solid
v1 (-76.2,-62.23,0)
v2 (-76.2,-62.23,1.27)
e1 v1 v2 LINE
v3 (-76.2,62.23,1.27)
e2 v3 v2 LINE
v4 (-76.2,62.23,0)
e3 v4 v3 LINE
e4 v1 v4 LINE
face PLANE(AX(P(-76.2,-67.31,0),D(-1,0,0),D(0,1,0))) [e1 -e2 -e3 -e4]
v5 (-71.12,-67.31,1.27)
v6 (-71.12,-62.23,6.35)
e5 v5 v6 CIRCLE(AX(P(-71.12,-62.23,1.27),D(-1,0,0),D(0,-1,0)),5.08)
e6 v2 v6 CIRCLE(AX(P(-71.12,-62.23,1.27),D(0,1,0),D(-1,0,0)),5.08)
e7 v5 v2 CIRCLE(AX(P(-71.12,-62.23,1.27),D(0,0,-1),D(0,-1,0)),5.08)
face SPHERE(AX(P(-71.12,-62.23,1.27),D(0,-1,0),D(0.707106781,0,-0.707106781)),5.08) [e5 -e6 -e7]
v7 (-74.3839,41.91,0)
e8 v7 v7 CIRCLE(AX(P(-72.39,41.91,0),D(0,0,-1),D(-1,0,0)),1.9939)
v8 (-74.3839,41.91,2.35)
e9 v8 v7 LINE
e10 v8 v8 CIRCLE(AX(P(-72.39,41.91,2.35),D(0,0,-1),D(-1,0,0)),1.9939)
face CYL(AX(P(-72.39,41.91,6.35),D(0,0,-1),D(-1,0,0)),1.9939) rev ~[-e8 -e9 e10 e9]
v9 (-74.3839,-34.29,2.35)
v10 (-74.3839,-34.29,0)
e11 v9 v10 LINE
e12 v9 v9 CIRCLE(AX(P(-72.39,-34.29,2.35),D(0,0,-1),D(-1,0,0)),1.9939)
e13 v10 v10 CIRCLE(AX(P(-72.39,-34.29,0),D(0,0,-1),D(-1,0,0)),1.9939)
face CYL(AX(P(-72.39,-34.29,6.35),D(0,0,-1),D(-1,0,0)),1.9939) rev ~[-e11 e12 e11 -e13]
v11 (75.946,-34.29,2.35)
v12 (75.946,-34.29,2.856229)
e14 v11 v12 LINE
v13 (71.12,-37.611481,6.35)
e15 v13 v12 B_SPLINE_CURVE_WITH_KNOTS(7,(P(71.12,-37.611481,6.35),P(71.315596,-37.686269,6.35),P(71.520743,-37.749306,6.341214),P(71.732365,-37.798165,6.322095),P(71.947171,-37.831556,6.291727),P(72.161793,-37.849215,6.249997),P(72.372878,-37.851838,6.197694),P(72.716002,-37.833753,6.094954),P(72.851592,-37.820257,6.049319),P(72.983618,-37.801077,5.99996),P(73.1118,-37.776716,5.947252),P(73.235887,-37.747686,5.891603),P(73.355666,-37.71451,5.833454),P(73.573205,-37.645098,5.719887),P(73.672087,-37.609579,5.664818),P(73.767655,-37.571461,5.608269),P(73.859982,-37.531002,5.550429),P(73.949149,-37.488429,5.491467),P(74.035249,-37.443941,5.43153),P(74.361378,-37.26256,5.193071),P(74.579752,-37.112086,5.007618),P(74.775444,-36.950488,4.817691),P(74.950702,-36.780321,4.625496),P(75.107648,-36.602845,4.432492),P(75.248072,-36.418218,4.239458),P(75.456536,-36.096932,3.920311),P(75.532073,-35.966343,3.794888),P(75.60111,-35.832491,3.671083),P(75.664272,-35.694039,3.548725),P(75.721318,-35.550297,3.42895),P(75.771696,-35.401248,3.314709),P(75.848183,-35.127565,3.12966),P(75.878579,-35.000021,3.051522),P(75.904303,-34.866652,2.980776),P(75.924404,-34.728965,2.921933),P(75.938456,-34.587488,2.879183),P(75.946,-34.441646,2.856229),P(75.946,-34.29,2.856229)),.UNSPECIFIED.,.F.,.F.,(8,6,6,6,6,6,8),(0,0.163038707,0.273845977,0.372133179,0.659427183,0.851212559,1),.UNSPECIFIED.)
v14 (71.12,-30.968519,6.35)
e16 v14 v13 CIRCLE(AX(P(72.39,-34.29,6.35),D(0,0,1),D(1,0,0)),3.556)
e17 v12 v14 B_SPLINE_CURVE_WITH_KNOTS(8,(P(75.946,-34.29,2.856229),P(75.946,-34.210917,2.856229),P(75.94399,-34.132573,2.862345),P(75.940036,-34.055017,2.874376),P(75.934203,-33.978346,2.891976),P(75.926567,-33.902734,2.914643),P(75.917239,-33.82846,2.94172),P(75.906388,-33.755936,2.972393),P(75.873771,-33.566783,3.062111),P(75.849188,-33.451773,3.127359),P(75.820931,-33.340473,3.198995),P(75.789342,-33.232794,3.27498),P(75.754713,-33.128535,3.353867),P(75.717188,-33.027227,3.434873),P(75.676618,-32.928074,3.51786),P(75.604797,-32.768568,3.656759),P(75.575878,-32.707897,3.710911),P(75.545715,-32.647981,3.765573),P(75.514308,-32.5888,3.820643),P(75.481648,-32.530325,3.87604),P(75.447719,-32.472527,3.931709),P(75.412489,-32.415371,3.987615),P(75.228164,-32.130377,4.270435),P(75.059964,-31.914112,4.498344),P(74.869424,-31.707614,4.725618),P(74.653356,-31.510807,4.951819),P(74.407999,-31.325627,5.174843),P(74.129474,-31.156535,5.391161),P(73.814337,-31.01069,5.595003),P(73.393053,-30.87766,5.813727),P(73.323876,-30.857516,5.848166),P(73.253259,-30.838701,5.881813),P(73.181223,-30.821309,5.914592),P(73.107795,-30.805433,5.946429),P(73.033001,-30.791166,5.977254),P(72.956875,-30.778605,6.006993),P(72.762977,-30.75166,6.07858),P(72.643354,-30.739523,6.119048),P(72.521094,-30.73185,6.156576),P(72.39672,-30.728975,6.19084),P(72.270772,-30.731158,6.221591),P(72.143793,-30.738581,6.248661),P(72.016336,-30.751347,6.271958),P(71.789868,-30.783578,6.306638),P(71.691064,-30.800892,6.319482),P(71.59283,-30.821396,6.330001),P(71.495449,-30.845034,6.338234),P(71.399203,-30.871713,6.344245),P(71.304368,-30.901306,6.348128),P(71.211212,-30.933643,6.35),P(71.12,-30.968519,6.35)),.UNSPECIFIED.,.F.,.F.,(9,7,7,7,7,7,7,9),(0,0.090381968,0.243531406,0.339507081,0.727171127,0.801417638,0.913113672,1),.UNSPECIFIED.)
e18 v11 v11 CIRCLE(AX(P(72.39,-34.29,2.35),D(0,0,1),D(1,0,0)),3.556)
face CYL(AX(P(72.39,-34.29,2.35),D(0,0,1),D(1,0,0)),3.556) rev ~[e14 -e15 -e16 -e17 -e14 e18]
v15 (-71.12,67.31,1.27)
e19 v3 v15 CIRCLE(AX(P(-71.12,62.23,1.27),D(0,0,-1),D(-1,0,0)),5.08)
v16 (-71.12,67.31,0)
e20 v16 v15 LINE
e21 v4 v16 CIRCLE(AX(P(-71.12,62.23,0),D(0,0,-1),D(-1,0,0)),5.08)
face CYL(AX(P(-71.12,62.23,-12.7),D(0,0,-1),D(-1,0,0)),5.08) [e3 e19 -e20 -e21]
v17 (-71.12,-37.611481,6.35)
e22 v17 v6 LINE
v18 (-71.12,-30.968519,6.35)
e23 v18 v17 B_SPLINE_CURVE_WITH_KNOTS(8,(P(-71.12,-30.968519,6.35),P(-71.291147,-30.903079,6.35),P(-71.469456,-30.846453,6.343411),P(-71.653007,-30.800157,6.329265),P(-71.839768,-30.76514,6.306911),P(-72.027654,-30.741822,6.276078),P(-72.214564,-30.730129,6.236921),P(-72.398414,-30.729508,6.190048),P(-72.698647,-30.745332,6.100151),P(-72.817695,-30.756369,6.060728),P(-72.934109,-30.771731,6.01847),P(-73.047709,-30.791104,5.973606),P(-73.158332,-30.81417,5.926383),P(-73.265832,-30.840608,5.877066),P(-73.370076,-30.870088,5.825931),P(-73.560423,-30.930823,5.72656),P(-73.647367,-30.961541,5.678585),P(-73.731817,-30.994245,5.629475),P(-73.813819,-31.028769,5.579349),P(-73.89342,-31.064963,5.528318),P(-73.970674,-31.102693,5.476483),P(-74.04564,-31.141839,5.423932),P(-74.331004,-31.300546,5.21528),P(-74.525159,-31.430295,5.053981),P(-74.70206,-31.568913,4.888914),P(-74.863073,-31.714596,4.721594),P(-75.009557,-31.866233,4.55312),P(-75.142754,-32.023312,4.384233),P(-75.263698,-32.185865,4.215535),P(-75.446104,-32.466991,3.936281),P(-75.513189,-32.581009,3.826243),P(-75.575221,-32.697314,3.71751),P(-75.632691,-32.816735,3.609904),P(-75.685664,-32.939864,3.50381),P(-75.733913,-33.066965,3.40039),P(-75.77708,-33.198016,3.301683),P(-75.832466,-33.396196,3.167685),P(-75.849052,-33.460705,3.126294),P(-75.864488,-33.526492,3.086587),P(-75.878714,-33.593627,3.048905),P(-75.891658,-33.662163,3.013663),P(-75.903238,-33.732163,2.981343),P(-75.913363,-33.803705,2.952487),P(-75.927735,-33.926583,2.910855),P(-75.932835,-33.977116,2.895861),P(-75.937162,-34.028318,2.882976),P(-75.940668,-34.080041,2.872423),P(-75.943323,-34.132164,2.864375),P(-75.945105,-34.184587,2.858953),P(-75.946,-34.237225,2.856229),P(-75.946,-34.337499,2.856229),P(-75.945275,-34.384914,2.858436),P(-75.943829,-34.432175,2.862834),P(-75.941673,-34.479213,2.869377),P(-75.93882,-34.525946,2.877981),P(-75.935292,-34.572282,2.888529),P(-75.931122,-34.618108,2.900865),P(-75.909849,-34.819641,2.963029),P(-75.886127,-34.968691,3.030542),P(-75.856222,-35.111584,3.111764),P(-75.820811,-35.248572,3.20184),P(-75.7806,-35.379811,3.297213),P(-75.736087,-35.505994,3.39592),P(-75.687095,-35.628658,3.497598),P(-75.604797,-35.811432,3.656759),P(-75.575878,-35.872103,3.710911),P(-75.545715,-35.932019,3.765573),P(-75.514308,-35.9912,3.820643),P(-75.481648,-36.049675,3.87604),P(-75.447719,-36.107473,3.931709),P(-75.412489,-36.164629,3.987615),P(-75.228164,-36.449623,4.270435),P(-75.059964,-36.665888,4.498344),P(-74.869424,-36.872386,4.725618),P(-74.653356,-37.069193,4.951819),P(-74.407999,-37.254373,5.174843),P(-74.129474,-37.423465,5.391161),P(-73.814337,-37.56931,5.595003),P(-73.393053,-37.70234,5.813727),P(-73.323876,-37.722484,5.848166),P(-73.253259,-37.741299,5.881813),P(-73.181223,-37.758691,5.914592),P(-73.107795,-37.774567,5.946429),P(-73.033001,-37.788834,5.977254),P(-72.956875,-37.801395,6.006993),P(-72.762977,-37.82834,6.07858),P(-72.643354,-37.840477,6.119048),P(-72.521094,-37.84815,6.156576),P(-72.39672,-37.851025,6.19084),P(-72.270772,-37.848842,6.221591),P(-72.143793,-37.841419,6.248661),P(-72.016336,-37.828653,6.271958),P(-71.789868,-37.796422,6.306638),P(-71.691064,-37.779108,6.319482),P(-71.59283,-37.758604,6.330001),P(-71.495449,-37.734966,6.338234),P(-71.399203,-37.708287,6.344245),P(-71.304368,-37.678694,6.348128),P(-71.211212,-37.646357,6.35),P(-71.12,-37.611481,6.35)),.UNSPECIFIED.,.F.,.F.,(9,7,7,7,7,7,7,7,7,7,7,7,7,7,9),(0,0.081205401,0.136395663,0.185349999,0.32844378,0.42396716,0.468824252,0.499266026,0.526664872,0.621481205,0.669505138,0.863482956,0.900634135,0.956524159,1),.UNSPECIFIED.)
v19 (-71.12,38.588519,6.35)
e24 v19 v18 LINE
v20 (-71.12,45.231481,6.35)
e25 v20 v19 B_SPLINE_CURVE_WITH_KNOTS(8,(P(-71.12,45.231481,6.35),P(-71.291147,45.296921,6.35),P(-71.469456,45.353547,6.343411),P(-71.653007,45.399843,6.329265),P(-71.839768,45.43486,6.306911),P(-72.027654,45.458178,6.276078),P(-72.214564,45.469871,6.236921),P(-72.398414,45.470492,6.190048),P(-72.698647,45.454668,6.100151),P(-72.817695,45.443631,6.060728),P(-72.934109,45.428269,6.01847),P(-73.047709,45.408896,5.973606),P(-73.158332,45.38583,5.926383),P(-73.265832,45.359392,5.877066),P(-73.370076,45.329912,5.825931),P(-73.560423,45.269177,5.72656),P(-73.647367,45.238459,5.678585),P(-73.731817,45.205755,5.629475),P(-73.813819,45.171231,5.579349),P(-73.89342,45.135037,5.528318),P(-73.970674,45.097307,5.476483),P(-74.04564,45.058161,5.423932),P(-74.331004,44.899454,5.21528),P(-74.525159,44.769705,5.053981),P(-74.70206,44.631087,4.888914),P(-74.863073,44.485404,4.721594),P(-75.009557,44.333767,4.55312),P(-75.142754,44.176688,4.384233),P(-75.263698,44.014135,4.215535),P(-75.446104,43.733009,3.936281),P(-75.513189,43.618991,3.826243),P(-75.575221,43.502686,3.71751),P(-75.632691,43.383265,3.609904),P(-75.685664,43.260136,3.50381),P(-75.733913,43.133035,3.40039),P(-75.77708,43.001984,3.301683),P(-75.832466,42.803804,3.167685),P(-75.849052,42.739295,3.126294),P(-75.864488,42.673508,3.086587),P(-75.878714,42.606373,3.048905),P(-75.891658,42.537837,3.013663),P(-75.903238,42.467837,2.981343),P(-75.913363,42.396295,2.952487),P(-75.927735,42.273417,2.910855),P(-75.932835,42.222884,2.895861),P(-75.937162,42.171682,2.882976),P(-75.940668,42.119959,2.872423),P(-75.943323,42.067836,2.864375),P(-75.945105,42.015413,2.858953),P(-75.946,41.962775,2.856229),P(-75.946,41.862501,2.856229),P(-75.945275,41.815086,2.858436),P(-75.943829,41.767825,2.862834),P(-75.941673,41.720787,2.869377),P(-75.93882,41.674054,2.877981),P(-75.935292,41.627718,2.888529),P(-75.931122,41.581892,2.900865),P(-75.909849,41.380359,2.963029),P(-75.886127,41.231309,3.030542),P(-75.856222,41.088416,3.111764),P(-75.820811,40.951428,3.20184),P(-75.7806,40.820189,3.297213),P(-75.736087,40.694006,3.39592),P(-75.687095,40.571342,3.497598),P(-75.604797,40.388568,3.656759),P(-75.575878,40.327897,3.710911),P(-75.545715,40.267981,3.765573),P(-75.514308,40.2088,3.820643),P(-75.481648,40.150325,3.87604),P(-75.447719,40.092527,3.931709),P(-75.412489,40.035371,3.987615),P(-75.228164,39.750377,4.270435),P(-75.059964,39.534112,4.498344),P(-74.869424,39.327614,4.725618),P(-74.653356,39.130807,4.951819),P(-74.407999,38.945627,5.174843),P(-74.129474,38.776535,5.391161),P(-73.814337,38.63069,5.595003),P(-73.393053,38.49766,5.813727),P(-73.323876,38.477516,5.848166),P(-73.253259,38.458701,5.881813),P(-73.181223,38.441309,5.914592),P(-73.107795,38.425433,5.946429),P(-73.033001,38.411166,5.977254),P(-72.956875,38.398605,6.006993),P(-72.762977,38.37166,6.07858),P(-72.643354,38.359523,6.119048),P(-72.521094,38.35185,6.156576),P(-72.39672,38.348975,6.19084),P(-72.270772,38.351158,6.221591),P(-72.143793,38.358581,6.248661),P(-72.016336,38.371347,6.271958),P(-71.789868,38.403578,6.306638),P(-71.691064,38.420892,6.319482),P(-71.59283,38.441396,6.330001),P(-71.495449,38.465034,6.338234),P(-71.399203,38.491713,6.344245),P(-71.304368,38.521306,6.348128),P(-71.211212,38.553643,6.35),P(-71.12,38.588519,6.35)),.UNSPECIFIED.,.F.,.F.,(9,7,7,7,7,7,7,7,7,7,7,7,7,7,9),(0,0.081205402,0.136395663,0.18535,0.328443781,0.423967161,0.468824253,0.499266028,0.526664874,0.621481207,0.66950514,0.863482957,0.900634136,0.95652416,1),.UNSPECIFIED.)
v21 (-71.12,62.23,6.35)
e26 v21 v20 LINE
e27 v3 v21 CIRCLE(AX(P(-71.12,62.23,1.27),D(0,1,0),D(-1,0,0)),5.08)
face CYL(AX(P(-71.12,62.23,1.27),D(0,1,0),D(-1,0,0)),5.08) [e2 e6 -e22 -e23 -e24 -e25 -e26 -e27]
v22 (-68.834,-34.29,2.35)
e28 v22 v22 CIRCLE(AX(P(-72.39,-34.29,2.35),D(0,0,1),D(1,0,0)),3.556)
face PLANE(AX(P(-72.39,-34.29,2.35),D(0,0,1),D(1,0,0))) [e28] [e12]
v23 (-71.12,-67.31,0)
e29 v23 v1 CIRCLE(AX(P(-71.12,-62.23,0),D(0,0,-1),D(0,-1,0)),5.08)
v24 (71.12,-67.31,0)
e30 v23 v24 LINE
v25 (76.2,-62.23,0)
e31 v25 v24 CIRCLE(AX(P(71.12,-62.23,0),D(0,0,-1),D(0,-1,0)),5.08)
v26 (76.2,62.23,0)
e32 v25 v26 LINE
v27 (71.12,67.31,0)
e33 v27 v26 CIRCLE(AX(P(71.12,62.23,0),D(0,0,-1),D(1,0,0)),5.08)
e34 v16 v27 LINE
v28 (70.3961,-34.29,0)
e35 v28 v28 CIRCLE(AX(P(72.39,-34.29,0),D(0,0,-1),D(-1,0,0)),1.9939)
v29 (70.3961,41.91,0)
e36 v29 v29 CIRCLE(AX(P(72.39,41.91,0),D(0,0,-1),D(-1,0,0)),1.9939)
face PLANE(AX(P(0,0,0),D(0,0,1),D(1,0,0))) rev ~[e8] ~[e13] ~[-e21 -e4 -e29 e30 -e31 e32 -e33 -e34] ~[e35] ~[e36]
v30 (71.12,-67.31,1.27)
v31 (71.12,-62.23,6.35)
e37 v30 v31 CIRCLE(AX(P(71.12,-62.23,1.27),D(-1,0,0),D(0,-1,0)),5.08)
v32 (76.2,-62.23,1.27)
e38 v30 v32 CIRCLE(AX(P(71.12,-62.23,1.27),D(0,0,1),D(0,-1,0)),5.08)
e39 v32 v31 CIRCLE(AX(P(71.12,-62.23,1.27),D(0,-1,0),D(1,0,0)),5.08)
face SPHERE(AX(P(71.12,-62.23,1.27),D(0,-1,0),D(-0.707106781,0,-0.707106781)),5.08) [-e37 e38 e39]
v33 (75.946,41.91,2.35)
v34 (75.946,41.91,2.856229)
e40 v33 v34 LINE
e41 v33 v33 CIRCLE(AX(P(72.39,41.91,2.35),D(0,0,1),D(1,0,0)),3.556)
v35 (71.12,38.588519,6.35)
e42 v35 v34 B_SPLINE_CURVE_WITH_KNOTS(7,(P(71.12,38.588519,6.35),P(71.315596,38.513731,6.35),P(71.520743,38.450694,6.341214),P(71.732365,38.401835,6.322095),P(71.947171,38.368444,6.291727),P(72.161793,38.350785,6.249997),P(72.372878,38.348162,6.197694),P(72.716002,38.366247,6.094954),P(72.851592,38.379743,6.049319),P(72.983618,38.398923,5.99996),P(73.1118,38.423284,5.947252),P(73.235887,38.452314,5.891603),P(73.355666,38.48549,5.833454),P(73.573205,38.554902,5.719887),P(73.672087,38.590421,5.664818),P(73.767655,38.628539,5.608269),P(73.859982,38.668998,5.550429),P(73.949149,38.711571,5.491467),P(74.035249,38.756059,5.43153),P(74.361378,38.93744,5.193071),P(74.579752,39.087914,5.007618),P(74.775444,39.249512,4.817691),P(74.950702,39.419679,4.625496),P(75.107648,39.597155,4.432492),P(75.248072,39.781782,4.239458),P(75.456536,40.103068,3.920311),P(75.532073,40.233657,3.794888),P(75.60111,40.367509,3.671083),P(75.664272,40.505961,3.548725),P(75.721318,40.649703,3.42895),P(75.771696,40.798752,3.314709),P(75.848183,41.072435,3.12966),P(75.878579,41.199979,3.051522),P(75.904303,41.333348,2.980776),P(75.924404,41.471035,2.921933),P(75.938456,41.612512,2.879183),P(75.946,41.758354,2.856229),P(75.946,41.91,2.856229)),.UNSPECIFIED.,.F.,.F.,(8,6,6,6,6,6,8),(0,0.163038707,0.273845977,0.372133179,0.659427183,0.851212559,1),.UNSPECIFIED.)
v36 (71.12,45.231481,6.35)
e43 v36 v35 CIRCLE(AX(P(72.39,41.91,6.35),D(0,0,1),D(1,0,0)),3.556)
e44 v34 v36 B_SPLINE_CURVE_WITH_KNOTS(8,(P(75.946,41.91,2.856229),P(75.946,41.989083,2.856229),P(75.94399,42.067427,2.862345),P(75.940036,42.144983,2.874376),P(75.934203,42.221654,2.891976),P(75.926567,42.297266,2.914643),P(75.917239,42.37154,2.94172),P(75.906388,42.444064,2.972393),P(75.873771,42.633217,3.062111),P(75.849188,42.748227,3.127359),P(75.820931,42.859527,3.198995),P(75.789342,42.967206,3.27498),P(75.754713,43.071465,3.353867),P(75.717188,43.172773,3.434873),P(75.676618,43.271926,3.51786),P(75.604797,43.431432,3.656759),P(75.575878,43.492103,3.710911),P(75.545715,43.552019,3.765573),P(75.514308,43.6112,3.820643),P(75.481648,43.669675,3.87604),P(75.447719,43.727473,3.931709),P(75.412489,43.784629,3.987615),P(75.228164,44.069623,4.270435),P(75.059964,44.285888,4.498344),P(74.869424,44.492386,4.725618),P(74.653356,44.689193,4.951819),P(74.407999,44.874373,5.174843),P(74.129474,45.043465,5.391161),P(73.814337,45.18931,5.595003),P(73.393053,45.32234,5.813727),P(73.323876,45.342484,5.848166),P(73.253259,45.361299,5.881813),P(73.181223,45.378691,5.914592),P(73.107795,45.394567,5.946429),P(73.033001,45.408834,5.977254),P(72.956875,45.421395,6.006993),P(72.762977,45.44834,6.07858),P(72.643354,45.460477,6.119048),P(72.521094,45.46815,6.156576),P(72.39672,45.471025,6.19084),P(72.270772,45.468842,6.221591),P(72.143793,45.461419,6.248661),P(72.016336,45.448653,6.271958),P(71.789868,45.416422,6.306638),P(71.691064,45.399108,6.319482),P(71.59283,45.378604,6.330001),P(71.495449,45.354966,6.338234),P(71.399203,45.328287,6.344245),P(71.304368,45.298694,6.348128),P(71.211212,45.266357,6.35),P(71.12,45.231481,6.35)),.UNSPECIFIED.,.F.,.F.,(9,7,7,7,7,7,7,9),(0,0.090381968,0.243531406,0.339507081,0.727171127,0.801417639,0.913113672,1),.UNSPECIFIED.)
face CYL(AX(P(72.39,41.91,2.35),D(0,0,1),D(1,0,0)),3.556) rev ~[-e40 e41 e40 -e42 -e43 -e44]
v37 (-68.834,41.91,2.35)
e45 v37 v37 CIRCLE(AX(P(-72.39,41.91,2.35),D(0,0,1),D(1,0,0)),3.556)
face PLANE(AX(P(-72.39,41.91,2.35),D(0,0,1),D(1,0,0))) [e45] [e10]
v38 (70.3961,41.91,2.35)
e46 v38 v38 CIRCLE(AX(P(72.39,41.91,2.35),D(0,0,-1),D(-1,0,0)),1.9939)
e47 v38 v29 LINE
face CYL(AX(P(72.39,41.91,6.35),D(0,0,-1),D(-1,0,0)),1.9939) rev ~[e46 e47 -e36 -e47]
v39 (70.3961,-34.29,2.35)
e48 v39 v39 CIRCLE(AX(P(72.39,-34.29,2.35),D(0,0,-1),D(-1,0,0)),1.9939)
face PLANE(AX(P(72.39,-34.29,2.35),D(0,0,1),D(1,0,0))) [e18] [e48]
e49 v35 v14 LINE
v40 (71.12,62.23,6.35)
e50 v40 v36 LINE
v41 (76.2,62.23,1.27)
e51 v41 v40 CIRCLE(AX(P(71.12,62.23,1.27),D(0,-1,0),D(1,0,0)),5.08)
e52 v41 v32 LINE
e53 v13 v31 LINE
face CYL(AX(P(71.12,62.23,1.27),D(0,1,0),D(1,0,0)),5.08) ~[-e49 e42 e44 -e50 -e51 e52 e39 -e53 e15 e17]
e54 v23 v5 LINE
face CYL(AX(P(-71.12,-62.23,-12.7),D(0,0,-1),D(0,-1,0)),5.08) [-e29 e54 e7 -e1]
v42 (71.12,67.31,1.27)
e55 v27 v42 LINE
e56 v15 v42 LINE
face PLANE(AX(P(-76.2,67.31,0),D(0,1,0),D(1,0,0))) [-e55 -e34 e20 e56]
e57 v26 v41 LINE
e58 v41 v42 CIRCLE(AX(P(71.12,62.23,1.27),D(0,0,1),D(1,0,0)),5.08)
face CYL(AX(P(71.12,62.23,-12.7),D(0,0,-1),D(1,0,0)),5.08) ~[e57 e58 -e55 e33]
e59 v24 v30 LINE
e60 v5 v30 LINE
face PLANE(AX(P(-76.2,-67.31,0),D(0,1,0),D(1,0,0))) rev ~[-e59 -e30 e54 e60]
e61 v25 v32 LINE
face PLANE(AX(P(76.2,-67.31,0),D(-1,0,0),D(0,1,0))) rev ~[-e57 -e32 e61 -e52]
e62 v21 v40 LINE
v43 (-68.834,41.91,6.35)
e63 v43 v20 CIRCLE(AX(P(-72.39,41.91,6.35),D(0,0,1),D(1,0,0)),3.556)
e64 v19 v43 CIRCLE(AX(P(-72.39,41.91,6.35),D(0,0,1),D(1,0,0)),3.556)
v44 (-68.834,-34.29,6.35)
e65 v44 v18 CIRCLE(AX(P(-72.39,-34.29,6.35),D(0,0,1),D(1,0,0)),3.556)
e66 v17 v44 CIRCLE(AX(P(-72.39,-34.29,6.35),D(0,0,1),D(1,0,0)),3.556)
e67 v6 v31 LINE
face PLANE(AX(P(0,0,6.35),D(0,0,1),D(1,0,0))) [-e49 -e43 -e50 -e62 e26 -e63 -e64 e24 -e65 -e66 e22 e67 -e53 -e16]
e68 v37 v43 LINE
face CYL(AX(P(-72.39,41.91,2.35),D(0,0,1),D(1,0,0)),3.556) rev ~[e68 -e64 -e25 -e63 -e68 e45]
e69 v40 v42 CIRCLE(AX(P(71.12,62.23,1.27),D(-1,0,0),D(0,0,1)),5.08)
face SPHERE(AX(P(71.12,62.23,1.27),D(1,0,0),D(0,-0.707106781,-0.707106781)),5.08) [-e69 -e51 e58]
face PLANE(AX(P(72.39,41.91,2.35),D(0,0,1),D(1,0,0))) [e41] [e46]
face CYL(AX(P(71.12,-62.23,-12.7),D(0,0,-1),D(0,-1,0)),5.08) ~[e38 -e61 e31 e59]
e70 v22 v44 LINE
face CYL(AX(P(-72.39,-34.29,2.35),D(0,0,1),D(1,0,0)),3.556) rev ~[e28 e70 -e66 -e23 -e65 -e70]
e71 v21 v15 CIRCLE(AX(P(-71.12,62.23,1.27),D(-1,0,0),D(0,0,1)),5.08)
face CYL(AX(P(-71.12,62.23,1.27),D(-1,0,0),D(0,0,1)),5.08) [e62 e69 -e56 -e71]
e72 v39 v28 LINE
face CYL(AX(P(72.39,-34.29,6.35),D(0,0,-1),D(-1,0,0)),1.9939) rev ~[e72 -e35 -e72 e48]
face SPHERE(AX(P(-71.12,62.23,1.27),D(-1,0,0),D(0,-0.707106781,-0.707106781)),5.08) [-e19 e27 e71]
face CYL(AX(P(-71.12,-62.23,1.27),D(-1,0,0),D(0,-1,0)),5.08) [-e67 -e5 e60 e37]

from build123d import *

# Parameters (mm, degrees)
F0_W           = 152.4
F0_H           = 134.62
F1_DEPTH       = 6.35
F3_D           = 3.9878
F3_CBORE_D     = 7.112
F3_CBORE_DEPTH = 4.000000001
F4_T1_DEPTH    = 124.46
F4_T3_DEPTH    = 142.24
F4_T5_DEPTH    = 13.97
F4_S9_W        = 5.08
F4_S9_H        = 5.08
F4_T10_DEPTH   = 5.08
F4_S15_W       = 5.08
F4_S15_H       = 5.08
F4_T16_DEPTH   = 5.08
F4_S21_W       = 5.08
F4_S21_H       = 5.08
F4_T22_DEPTH   = 5.08
F4_S27_W       = 5.08
F4_S27_H       = 5.08
F4_T28_DEPTH   = 5.08


# Not quite as in the source:
# - a fillet or chamfer that OpenCascade refuses, or shapes differently, is made with other operations: its cross-section is extruded or revolved along the edge and cut away or added
# - a feature names something its author has since deleted; it is built from what else it names


with BuildPart() as f1:
    # F0 (on Top) → F1 (new body)
    with BuildSketch(Plane.XY):
        Rectangle(F0_W, F0_H)
    extrude(amount=F1_DEPTH)

    # F3 (through all)
    with Locations(Plane.XY.offset(6.35)):
        with Locations((-72.39, 41.91), (-72.39, -34.29), (72.39, -34.29), (72.39, 41.91)):
            CounterBoreHole(F3_D / 2, F3_CBORE_D / 2, F3_CBORE_DEPTH)

    # F4: fillet of radius 5.08 on 8 edges, made by hand

    # F4_s2 → F4_t1 (cut)
    with BuildSketch(Plane.XZ.offset(-62.23)):
        with BuildLine():
            ThreePointArc((-76.2, 1.27), (-74.7121024484, 4.8621024484), (-71.12, 6.35))
            Line((-71.12, 6.35), (-76.2, 6.35))
            Line((-76.2, 6.35), (-76.2, 1.27))
        make_face()
        with BuildLine():
            ThreePointArc((76.2, 1.27), (74.7121024484, 4.8621024484), (71.12, 6.35))
            Line((71.12, 6.35), (76.2, 6.35))
            Line((76.2, 6.35), (76.2, 1.27))
        make_face()
    extrude(amount=F4_T1_DEPTH, mode=Mode.SUBTRACT)

    # F4_s4 → F4_t3 (cut)
    with BuildSketch(Plane.YZ.offset(-71.12)):
        with BuildLine():
            ThreePointArc((62.23, 6.35), (65.8221024484, 4.8621024484), (67.31, 1.27))
            Line((67.31, 1.27), (67.31, 6.35))
            Line((67.31, 6.35), (62.23, 6.35))
        make_face()
        with BuildLine():
            ThreePointArc((-67.31, 1.27), (-65.8221024484, 4.8621024484), (-62.23, 6.35))
            Line((-62.23, 6.35), (-67.31, 6.35))
            Line((-67.31, 6.35), (-67.31, 1.27))
        make_face()
    extrude(amount=F4_T3_DEPTH, mode=Mode.SUBTRACT)

    # F4_s6 → F4_t5 (cut)
    with BuildSketch(Plane.XY.offset(-12.7)):
        with BuildLine():
            ThreePointArc((-71.12, -67.31), (-74.7121024484, -65.8221024484), (-76.2, -62.23))
            Line((-76.2, -62.23), (-76.2, -67.31))
            Line((-76.2, -67.31), (-71.12, -67.31))
        make_face()
        with BuildLine():
            ThreePointArc((71.12, -67.31), (74.7121024484, -65.8221024484), (76.2, -62.23))
            Line((76.2, -62.23), (76.2, -67.31))
            Line((76.2, -67.31), (71.12, -67.31))
        make_face()
        with BuildLine():
            ThreePointArc((76.2, 62.23), (74.7121024484, 65.8221024484), (71.12, 67.31))
            Line((71.12, 67.31), (76.2, 67.31))
            Line((76.2, 67.31), (76.2, 62.23))
        make_face()
        with BuildLine():
            ThreePointArc((-76.2, 62.23), (-74.7121024484, 65.8221024484), (-71.12, 67.31))
            Line((-71.12, 67.31), (-76.2, 67.31))
            Line((-76.2, 67.31), (-76.2, 62.23))
        make_face()
    extrude(amount=F4_T5_DEPTH, mode=Mode.SUBTRACT)


with BuildPart() as f4_tool8:
    # F4_s9 → F4_t10 (new body)
    with BuildSketch(Plane.YZ.offset(-71.12)):
        with Locations((64.77, 3.81)):
            Rectangle(F4_S9_W, F4_S9_H)
    extrude(amount=-F4_T10_DEPTH)

    # F4_s11 → F4_t12 (revolve, cut)
    with BuildSketch(Plane(origin=(-71.12, 62.23, 1.27), x_dir=(0, -0.7071067812, -0.7071067812), z_dir=(0, 0.7071067812, -0.7071067812))):
        with BuildLine():
            ThreePointArc((0, -5.08), (5.08, 0), (0, 5.08))
            Line((0, 5.08), (0, -5.08))
        make_face()
    revolve(axis=Axis((-71.12, 62.23, 1.27), (-1, 0, 0)), mode=Mode.SUBTRACT)


with BuildPart() as f1_1:
    add(f1.part)

    # F4_t7: cut F4_tool8
    add(f4_tool8.part, mode=Mode.SUBTRACT)


with BuildPart() as f4_tool14:
    # F4_s15 → F4_t16 (new body)
    with BuildSketch(Plane.XZ.offset(62.23)):
        with Locations((-73.66, 3.81)):
            Rectangle(F4_S15_W, F4_S15_H)
    extrude(amount=F4_T16_DEPTH)

    # F4_s17 → F4_t18 (revolve, cut)
    with BuildSketch(Plane(origin=(-71.12, -62.23, 1.27), x_dir=(0.7071067812, 0, -0.7071067812), z_dir=(-0.7071067812, 0, -0.7071067812))):
        with BuildLine():
            ThreePointArc((0, -5.08), (5.08, 0), (0, 5.08))
            Line((0, 5.08), (0, -5.08))
        make_face()
    revolve(axis=Axis((-71.12, -62.23, 1.27), (0, -1, 0)), mode=Mode.SUBTRACT)


with BuildPart() as f1_2:
    add(f1_1.part)

    # F4_t13: cut F4_tool14
    add(f4_tool14.part, mode=Mode.SUBTRACT)


with BuildPart() as f4_tool20:
    # F4_s21 → F4_t22 (new body)
    with BuildSketch(Plane.YZ.offset(71.12)):
        with Locations((64.77, 3.81)):
            Rectangle(F4_S21_W, F4_S21_H)
    extrude(amount=F4_T22_DEPTH)

    # F4_s23 → F4_t24 (revolve, cut)
    with BuildSketch(Plane(origin=(71.12, 62.23, 1.27), x_dir=(0, -0.7071067812, -0.7071067812), z_dir=(0, -0.7071067812, 0.7071067812))):
        with BuildLine():
            ThreePointArc((0, -5.08), (5.08, 0), (0, 5.08))
            Line((0, 5.08), (0, -5.08))
        make_face()
    revolve(axis=Axis((71.12, 62.23, 1.27), (1, 0, 0)), mode=Mode.SUBTRACT)


with BuildPart() as f1_3:
    add(f1_2.part)

    # F4_t19: cut F4_tool20
    add(f4_tool20.part, mode=Mode.SUBTRACT)


with BuildPart() as f4_tool26:
    # F4_s27 → F4_t28 (new body)
    with BuildSketch(Plane.XZ.offset(62.23)):
        with Locations((73.66, 3.81)):
            Rectangle(F4_S27_W, F4_S27_H)
    extrude(amount=F4_T28_DEPTH)

    # F4_s29 → F4_t30 (revolve, cut)
    with BuildSketch(Plane(origin=(71.12, -62.23, 1.27), x_dir=(-0.7071067812, 0, -0.7071067812), z_dir=(-0.7071067812, 0, 0.7071067812))):
        with BuildLine():
            ThreePointArc((0, -5.08), (5.08, 0), (0, 5.08))
            Line((0, 5.08), (0, -5.08))
        make_face()
    revolve(axis=Axis((71.12, -62.23, 1.27), (0, -1, 0)), mode=Mode.SUBTRACT)


with BuildPart() as f1_4:
    add(f1_3.part)

    # F4_t25: cut F4_tool26
    add(f4_tool26.part, mode=Mode.SUBTRACT)


solid = f1_4.part
